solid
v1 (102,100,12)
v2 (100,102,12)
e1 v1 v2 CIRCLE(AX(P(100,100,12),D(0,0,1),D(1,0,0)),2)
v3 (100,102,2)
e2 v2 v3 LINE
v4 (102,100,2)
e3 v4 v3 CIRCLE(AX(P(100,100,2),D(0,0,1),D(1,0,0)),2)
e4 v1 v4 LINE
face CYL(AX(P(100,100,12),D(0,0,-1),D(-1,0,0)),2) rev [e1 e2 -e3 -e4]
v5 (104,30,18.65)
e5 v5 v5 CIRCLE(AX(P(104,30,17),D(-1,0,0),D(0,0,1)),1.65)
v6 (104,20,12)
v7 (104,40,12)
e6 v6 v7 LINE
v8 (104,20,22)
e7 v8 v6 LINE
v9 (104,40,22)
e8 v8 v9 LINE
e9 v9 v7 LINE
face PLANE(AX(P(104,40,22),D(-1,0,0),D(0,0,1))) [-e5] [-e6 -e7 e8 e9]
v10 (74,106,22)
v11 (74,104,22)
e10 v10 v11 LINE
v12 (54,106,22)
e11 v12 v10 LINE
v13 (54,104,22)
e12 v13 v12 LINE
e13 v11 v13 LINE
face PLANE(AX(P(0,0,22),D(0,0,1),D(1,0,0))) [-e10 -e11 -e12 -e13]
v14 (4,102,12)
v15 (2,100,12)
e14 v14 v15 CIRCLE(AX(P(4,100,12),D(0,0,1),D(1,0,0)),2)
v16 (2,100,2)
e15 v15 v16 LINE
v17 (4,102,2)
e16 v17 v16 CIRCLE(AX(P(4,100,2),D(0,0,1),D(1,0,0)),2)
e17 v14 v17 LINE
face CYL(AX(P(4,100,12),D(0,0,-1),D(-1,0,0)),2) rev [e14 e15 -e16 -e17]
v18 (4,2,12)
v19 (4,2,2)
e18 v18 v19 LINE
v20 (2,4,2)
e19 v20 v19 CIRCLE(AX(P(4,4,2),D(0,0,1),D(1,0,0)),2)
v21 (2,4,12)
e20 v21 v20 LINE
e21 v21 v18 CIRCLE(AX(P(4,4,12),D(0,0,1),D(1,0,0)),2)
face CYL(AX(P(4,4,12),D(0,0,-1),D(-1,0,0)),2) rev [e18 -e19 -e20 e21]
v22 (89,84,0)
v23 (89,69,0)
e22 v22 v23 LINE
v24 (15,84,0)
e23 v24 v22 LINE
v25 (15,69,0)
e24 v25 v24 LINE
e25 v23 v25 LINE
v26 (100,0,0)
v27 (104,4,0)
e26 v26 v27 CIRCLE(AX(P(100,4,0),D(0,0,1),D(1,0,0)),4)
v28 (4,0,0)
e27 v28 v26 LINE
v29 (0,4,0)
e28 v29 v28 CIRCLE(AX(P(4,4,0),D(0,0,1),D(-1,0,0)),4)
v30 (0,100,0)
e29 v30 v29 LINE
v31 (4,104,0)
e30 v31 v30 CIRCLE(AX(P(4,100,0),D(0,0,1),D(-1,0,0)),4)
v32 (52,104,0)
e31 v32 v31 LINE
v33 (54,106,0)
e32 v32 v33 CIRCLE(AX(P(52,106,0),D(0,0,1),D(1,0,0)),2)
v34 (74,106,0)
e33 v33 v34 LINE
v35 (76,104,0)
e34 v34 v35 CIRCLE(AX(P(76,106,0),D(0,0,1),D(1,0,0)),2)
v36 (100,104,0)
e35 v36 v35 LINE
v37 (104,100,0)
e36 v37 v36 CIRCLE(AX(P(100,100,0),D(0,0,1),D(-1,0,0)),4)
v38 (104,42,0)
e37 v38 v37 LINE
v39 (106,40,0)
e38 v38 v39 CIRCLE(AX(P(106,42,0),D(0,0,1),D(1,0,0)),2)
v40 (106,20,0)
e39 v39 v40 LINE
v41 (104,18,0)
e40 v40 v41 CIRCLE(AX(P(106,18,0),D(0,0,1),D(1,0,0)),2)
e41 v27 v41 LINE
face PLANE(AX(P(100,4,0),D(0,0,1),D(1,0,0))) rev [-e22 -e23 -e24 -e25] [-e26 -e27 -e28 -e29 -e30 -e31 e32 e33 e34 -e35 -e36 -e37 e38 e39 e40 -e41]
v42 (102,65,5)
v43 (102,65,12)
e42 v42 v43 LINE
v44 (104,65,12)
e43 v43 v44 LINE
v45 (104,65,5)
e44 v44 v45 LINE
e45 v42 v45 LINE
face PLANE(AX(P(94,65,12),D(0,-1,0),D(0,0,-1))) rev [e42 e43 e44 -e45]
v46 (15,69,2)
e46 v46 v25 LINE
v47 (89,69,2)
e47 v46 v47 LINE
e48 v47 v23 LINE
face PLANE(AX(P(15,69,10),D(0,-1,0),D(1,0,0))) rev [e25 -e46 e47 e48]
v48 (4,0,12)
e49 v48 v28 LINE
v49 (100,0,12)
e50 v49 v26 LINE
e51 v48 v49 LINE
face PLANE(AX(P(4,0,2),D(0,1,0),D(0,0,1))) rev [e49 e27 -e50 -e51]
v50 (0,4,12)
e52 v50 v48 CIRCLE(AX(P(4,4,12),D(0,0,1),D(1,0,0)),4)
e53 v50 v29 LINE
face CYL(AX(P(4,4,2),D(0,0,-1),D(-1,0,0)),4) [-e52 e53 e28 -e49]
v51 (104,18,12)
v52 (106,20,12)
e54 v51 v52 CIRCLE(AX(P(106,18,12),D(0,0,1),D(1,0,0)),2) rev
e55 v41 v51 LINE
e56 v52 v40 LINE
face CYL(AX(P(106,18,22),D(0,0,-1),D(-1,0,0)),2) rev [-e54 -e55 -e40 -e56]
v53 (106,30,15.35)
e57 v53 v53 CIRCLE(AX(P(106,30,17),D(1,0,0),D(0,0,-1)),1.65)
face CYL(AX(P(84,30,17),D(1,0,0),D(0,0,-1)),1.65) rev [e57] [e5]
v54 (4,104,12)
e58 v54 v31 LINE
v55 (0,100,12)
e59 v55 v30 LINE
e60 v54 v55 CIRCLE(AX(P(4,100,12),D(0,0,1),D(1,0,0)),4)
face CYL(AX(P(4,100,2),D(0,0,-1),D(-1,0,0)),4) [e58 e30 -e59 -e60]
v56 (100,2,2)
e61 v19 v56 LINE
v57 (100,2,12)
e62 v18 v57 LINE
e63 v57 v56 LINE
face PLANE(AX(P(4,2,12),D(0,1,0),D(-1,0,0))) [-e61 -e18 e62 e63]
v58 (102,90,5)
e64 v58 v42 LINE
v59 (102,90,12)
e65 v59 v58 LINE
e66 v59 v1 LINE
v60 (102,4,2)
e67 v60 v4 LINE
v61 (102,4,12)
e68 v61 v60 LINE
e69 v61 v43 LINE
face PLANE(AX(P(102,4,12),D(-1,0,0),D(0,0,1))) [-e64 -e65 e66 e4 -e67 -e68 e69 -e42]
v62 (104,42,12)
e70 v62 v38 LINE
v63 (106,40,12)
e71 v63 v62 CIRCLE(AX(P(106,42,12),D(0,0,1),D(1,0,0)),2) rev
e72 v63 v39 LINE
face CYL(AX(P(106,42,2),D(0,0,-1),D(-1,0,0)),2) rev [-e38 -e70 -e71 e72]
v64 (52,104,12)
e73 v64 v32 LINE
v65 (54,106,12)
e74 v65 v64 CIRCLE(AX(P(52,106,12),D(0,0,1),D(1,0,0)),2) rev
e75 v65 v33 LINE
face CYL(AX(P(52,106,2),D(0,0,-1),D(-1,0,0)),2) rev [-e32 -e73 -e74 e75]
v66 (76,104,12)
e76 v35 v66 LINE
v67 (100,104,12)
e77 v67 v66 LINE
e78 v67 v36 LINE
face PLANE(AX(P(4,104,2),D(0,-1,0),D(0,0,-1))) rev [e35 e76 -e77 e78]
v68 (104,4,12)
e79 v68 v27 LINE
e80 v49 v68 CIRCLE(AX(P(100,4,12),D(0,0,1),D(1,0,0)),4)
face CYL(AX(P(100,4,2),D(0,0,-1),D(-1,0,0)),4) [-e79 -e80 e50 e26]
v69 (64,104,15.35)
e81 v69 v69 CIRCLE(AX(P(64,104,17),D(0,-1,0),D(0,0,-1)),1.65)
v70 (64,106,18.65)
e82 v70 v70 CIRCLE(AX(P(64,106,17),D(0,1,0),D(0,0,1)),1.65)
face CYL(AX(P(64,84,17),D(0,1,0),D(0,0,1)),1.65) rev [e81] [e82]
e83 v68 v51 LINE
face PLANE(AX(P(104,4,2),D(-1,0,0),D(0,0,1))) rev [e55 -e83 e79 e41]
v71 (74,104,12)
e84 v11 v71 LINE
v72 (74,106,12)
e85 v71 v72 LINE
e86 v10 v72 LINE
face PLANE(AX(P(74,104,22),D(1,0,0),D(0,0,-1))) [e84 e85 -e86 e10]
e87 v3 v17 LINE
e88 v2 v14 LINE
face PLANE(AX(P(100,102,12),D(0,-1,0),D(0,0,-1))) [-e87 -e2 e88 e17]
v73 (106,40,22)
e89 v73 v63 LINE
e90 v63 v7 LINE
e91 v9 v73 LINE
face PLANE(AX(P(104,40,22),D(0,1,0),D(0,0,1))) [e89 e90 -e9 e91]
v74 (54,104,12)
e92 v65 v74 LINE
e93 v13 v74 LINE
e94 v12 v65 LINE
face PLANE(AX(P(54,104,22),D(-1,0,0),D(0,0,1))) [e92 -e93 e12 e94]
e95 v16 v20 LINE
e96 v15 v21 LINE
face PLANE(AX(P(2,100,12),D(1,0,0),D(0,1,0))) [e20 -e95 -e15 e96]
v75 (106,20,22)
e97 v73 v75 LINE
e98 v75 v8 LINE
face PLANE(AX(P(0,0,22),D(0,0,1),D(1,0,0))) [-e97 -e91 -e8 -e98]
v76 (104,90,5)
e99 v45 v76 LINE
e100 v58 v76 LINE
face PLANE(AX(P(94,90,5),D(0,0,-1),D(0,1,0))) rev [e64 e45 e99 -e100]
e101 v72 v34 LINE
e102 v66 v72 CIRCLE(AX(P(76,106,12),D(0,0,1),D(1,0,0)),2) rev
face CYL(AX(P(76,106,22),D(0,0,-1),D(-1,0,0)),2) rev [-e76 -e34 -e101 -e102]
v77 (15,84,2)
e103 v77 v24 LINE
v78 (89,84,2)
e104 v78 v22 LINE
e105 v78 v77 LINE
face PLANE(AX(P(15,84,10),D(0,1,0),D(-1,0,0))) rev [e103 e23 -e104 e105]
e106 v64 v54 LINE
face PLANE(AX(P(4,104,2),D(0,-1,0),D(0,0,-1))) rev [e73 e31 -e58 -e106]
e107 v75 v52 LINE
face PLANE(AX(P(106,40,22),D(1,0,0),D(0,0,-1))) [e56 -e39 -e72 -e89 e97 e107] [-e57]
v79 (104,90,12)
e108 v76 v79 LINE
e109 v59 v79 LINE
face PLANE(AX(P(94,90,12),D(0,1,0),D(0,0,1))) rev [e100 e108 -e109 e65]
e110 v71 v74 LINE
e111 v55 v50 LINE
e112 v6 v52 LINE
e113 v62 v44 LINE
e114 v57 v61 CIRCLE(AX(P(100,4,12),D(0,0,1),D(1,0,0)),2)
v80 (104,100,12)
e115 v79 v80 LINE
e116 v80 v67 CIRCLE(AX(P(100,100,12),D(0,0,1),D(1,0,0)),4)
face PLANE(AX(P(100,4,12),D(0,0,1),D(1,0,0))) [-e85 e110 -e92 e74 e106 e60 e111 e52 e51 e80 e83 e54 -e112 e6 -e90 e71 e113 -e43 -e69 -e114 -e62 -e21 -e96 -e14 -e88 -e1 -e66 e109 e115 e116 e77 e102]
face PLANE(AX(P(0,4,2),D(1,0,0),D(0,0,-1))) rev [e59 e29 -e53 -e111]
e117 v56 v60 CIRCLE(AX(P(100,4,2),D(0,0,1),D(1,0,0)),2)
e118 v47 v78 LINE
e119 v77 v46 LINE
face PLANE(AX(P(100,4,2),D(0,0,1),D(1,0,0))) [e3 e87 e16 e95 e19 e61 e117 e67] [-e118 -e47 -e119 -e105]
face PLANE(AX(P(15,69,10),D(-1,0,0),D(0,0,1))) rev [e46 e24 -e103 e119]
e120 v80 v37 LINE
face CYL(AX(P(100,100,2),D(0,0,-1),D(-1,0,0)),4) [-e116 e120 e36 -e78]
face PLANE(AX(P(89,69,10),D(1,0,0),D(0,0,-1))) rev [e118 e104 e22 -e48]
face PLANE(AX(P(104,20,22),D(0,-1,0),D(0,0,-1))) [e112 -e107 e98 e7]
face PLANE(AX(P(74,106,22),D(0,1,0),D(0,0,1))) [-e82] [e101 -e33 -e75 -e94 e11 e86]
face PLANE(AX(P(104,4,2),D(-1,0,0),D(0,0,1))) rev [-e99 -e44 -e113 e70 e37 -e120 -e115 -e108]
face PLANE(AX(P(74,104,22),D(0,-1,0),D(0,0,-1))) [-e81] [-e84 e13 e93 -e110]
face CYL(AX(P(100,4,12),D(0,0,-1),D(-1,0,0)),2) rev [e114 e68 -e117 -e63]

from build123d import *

# Parameters (mm, degrees)
EXTRUDE_2_DEPTH     = 2
EXTRUDE_3_DEPTH     = 10
SKETCH_5_W          = 7
SKETCH_5_H          = 25
CUT_EXTRUDE_1_DEPTH = 10
SKETCH_6_W          = 74
SKETCH_6_H          = 15
CUT_EXTRUDE_2_DEPTH = 10
SKETCH_7_W          = 20
SKETCH_7_H          = 2
SKETCH_7_W_2        = 2
SKETCH_7_H_2        = 20
EXTRUDE_4_DEPTH     = 22
SKETCH_8_R          = 1.65
CUT_EXTRUDE_3_DEPTH = 22
SKETCH_10_R         = 1.65
CUT_EXTRUDE_4_DEPTH = 22
FILLET_1_R          = 2


with BuildPart() as part:
    # 草图1 → 凸台-拉伸2 (new body)
    with BuildSketch(Plane.XY):
        with BuildLine():
            Line((4, 0), (100, 0))
            ThreePointArc((100, 0), (102.828427125, 1.171572875), (104, 4))
            Line((104, 4), (104, 100))
            ThreePointArc((104, 100), (102.828427125, 102.828427125), (100, 104))
            Line((100, 104), (4, 104))
            ThreePointArc((4, 104), (1.171572875, 102.828427125), (0, 100))
            Line((0, 100), (0, 4))
            ThreePointArc((0, 4), (1.171572875, 1.171572875), (4, 0))
        make_face()
    extrude(amount=EXTRUDE_2_DEPTH)

    # 草图4 → 凸台-拉伸3 (add)
    with BuildSketch(Plane.XY.offset(2)):
        with BuildLine():
            Line((104, 4), (104, 100))
            ThreePointArc((104, 100), (102.828427125, 102.828427125), (100, 104))
            Line((100, 104), (4, 104))
            ThreePointArc((4, 104), (1.171572875, 102.828427125), (0, 100))
            Line((0, 100), (0, 4))
            ThreePointArc((0, 4), (1.171572875, 1.171572875), (4, 0))
            Line((4, 0), (100, 0))
            ThreePointArc((100, 0), (102.828427125, 1.171572875), (104, 4))
        make_face()
        with BuildLine():
            Line((102, 4), (102, 100))
            ThreePointArc((102, 100), (101.414213562, 101.414213562), (100, 102))
            Line((100, 102), (4, 102))
            ThreePointArc((4, 102), (2.585786438, 101.414213562), (2, 100))
            Line((2, 100), (2, 4))
            ThreePointArc((2, 4), (2.585786438, 2.585786438), (4, 2))
            Line((4, 2), (100, 2))
            ThreePointArc((100, 2), (101.414213562, 2.585786438), (102, 4))
        make_face(mode=Mode.SUBTRACT)
    extrude(amount=EXTRUDE_3_DEPTH)

    # 草图5 → 切除-拉伸1 (cut)
    with BuildSketch(Plane(origin=(104, 0, 0), x_dir=(0, 0, -1), z_dir=(1, 0, 0))):
        with Locations((-8.5, 77.5)):
            Rectangle(SKETCH_5_W, SKETCH_5_H)
    extrude(amount=-CUT_EXTRUDE_1_DEPTH, mode=Mode.SUBTRACT)

    # 草图6 → 切除-拉伸2 (cut)
    with BuildSketch(Plane(origin=(0, 0, 0), x_dir=(-1, 0, 0), z_dir=(0, 0, -1))):
        with Locations((-52, 76.5)):
            Rectangle(SKETCH_6_W, SKETCH_6_H)
    extrude(amount=-CUT_EXTRUDE_2_DEPTH, mode=Mode.SUBTRACT)

    # 草图7 → 凸台-拉伸4 (add)
    with BuildSketch(Plane(origin=(0, 0, 0), x_dir=(-1, 0, 0), z_dir=(0, 0, -1))):
        with Locations((-64, 105)):
            Rectangle(SKETCH_7_W, SKETCH_7_H)
        with Locations((-105, 30)):
            Rectangle(SKETCH_7_W_2, SKETCH_7_H_2)
    extrude(amount=-EXTRUDE_4_DEPTH)

    # 草图8 → 切除-拉伸3 (cut)
    with BuildSketch(Plane(origin=(106, 0, 0), x_dir=(0, 0, -1), z_dir=(1, 0, 0))):
        with Locations((-17, 30)):
            Circle(SKETCH_8_R)
    extrude(amount=-CUT_EXTRUDE_3_DEPTH, mode=Mode.SUBTRACT)

    # 草图10 → 切除-拉伸4 (cut)
    with BuildSketch(Plane(origin=(0, 106, 0), x_dir=(1, 0, 0), z_dir=(0, 1, 0))):
        with Locations(Location((64, -17, 0), (0, 0, 270))):
            Circle(SKETCH_10_R)
    extrude(amount=-CUT_EXTRUDE_4_DEPTH, mode=Mode.SUBTRACT)

    # 圆角1
    fillet_1_edges = [part.edges().sort_by_distance(p)[0] for p in [
        (54, 104, 6),
        (74, 104, 6),
        (104, 40, 6),
        (104, 20, 6),
    ]]
    fillet(fillet_1_edges, radius=FILLET_1_R - 0.0001)  # a hair under: the kernel refuses the full size


solid = part.part
